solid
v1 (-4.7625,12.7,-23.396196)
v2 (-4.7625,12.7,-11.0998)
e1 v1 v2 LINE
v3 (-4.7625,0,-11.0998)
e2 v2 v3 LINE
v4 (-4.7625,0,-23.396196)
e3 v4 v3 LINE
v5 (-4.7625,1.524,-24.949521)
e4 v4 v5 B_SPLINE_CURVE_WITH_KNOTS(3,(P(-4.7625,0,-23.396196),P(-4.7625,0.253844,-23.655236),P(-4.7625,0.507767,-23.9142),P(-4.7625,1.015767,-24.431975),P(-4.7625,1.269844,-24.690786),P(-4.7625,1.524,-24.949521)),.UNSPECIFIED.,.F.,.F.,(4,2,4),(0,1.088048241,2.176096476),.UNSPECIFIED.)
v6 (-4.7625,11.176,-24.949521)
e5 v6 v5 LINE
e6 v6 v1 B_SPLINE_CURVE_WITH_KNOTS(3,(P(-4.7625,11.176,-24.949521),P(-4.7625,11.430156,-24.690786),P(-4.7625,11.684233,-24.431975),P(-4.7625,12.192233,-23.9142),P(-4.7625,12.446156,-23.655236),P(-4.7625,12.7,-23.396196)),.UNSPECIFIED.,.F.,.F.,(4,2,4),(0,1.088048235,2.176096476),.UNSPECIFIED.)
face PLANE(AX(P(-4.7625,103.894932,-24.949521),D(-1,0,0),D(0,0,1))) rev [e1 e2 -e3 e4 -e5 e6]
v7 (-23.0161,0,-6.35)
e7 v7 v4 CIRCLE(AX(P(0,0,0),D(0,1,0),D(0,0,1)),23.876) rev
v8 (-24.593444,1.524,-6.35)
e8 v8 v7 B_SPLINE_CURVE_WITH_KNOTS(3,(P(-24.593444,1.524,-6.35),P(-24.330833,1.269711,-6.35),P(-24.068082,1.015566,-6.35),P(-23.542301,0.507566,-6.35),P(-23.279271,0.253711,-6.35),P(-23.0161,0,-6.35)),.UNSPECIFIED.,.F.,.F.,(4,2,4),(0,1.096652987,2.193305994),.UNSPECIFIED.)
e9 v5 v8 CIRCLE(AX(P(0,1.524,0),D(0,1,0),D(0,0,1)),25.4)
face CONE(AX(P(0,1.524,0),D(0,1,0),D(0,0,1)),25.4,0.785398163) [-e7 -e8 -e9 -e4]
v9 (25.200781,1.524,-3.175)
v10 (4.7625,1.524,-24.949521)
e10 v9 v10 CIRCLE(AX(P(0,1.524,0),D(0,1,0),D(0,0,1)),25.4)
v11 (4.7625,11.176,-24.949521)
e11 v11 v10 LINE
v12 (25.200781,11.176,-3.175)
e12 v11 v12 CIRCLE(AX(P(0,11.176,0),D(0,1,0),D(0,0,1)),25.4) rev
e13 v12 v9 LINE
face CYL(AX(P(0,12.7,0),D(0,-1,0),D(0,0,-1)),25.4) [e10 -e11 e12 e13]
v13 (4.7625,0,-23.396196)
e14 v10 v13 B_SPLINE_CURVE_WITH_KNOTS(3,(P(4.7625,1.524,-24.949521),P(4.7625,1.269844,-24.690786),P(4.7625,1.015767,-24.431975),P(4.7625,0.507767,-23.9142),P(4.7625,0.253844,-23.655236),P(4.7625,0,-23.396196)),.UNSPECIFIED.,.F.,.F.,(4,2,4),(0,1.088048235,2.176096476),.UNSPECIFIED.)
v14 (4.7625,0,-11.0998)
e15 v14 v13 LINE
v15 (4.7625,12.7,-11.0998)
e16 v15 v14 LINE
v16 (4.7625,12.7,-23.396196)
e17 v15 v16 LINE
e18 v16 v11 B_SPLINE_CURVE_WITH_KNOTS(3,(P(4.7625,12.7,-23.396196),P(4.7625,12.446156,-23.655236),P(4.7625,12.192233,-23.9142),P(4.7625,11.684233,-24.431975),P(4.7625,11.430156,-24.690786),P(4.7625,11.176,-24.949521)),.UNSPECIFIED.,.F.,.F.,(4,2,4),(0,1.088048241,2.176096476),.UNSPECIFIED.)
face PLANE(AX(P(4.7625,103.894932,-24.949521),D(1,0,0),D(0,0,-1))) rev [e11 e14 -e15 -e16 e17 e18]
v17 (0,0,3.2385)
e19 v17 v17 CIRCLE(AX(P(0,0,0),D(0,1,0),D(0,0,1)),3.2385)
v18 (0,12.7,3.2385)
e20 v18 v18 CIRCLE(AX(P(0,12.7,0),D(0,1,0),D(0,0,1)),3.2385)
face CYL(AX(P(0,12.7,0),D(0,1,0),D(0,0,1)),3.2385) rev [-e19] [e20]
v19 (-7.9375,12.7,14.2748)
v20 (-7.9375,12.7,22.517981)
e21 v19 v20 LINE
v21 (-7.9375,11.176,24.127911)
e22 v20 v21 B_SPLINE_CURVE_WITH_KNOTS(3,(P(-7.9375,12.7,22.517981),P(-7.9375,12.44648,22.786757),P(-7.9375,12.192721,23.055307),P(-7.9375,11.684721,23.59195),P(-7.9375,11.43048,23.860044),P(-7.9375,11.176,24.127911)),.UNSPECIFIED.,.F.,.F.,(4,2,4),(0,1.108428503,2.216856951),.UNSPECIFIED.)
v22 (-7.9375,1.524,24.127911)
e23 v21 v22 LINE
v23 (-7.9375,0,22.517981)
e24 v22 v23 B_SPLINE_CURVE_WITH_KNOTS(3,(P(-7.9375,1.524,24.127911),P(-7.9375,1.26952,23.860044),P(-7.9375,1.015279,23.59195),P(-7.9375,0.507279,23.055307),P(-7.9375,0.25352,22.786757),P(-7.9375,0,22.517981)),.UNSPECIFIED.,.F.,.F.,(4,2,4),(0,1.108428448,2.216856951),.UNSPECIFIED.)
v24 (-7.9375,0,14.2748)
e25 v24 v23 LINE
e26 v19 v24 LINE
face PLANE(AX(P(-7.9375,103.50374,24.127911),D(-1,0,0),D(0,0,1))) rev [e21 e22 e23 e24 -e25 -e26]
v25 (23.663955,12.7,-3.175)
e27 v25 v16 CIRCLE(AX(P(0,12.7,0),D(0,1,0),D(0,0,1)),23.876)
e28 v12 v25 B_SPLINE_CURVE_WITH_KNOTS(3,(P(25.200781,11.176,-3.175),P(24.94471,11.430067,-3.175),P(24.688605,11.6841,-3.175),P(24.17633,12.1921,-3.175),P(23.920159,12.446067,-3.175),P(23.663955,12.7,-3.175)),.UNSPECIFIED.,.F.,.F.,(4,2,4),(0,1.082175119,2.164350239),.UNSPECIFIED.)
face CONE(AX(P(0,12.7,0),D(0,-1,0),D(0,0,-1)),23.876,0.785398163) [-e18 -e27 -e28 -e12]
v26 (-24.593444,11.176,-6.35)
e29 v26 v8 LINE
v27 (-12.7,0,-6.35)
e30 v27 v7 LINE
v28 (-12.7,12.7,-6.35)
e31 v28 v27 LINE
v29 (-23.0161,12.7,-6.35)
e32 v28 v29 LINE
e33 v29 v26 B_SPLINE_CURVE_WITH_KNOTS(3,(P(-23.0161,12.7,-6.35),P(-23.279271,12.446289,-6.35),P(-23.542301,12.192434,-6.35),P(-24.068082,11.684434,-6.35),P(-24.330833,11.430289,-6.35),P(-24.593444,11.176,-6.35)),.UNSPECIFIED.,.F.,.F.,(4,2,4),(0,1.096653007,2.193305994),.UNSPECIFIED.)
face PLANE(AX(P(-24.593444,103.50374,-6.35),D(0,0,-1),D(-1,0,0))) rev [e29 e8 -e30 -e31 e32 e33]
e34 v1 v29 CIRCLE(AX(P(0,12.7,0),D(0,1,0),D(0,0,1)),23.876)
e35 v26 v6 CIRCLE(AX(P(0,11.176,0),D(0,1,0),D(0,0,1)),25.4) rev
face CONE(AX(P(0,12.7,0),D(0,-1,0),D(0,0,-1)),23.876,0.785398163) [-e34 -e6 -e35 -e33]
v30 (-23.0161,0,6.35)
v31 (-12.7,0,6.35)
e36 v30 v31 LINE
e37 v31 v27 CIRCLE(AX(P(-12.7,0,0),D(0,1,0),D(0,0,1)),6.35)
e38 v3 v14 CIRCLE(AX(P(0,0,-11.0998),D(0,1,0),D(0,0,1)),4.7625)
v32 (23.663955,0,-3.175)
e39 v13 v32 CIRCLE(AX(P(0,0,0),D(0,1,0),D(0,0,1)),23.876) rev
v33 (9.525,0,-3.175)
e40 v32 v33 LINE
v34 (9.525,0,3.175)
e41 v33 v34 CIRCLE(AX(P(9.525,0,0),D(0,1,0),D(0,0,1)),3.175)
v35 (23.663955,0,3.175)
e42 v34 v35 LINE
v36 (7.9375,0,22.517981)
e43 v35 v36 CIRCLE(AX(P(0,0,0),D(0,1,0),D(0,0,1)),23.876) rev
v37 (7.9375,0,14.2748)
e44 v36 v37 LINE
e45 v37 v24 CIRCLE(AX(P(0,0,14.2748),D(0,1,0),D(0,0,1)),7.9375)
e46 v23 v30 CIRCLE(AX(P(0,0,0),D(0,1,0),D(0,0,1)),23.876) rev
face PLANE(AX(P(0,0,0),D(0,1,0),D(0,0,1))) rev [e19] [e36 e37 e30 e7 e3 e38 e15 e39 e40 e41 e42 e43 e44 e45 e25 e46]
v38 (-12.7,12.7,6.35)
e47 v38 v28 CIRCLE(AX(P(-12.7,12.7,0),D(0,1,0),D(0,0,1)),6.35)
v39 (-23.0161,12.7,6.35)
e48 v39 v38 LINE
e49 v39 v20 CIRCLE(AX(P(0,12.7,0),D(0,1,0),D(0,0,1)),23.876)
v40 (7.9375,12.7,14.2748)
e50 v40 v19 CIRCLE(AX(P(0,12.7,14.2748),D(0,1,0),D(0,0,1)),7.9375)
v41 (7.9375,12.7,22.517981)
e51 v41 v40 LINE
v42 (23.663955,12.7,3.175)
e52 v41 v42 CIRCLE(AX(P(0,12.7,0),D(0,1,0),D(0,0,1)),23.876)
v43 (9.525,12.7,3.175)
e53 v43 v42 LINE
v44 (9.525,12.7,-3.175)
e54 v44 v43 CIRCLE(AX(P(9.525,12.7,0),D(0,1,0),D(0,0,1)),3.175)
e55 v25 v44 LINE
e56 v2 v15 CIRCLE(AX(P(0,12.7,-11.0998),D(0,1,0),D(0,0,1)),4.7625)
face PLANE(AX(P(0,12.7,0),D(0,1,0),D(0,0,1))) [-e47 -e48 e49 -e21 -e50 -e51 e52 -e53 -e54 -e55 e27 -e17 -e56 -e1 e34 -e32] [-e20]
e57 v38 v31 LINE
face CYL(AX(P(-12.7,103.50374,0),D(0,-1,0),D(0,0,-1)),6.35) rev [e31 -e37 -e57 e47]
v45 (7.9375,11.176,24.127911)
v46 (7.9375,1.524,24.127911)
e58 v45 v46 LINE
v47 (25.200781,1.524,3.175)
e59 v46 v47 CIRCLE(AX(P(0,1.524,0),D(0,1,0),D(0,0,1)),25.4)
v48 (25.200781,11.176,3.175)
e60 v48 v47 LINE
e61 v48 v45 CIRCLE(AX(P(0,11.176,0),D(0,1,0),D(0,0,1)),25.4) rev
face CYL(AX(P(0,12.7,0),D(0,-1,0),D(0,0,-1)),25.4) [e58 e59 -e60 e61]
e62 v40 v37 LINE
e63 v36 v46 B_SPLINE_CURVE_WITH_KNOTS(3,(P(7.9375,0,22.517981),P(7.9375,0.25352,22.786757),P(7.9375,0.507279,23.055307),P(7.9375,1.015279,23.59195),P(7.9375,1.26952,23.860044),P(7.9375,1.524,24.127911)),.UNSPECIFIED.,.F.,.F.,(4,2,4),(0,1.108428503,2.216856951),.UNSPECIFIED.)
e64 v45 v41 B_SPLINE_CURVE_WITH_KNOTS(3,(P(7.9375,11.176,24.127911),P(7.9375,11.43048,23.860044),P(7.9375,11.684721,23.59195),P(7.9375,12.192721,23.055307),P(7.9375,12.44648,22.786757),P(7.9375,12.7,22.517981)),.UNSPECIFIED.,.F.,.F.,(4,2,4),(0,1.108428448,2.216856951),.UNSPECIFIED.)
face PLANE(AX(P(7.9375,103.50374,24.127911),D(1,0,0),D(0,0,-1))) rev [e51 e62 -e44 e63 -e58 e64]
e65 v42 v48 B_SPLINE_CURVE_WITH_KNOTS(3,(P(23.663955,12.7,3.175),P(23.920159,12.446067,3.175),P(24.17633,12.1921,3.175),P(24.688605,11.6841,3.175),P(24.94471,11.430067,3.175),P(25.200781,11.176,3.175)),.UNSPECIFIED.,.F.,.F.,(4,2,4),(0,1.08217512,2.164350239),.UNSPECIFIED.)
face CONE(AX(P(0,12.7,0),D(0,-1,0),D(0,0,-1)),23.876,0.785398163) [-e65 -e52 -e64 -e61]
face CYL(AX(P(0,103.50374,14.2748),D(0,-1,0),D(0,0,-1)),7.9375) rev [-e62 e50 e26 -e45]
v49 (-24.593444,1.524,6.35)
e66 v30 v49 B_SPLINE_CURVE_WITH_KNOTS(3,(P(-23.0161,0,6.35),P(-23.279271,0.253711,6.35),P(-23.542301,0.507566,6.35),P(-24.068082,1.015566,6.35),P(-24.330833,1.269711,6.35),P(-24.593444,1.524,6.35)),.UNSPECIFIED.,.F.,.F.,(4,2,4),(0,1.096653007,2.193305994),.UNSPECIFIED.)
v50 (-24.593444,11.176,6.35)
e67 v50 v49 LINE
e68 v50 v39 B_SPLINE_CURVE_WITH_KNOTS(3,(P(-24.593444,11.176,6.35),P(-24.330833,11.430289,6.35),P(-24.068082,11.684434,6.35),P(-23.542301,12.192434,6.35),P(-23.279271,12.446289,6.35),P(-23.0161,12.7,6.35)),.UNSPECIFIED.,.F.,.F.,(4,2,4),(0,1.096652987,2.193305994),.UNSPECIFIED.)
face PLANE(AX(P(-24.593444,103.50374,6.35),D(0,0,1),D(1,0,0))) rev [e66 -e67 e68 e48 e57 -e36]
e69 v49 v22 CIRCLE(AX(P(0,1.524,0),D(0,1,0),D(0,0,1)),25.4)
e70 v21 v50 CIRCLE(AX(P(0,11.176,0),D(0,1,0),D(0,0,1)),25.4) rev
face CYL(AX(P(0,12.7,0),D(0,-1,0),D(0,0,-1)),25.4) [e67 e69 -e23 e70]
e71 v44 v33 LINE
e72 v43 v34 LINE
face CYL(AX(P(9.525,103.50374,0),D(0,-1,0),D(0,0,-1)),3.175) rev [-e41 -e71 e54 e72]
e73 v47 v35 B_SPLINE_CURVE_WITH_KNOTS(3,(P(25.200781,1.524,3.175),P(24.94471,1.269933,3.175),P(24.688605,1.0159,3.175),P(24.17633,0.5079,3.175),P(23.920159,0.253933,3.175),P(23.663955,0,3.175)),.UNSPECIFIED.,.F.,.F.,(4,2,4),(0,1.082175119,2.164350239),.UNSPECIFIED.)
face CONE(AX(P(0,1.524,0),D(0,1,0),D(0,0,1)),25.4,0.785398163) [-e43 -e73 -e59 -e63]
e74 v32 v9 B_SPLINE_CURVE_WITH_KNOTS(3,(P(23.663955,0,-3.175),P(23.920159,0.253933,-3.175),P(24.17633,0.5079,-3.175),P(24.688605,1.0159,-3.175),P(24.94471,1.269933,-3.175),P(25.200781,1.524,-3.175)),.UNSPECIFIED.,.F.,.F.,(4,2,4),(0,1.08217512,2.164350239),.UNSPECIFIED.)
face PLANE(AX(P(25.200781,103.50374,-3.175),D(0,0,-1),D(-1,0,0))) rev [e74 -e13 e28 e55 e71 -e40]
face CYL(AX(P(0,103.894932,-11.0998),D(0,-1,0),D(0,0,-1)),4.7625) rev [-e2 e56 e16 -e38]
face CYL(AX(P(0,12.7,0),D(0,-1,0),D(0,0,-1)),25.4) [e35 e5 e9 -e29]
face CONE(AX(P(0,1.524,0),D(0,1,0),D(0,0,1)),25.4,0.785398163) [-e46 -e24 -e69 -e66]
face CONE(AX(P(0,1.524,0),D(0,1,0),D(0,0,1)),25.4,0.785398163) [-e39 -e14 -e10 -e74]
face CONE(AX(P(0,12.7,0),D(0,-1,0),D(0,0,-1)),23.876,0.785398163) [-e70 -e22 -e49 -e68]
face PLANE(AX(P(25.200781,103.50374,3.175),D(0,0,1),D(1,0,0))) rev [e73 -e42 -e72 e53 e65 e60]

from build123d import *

# Parameters (mm, degrees)
SKETCH1_R           = 25.4
BOSS_EXTRUDE1_DEPTH = 12.7
HOLE1_D             = 6.477
CUT_EXTRUDE4_DEPTH  = 39.1
CIRPATTERN1_DEPTH   = 12.7
CHAMFER1_SIZE       = 1.524


# Read off the part's stored shape, not the designer's step: CirPattern1
with BuildPart() as part:
    # Sketch1 → Boss-Extrude1 (new body)
    with BuildSketch(Plane(origin=(0, 0, 0), x_dir=(1, 0, 0), z_dir=(0, 1, 0))):
        with Locations(Location((0, 0, 0), (0, 0, 270))):
            Circle(SKETCH1_R)
    extrude(amount=BOSS_EXTRUDE1_DEPTH)

    # Hole1 (through all)
    with Locations(Plane(origin=(0, 12.7, 0), x_dir=(1, 0, 0), z_dir=(0, 1, 0))):
        with Locations((0, 0)):
            Hole(HOLE1_D / 2)

    # Sketch4 → Cut-Extrude4 (cut, symmetric)
    with BuildSketch(Plane(origin=(0, 12.7, 0), x_dir=(1, 0, 0), z_dir=(0, 1, 0))):
        with BuildLine():
            Line((-4.7625, 152.335221274), (-4.7625, 24.949520912))
            Line((-4.7625, 24.949520912), (-4.7625, 11.0998))
            ThreePointArc((-4.7625, 11.0998), (0, 6.3373), (4.7625, 11.0998))
            Line((4.7625, 11.0998), (4.7625, 24.949520912))
            Line((4.7625, 24.949520912), (4.7625, 152.335221274))
            Line((4.7625, 152.335221274), (4.7625, 407.106621997))
            Line((4.7625, 407.106621997), (-4.7625, 407.106621997))
            Line((-4.7625, 407.106621997), (-4.7625, 152.335221274))
        make_face()
    extrude(amount=CUT_EXTRUDE4_DEPTH, both=True, mode=Mode.SUBTRACT)

    # CirPattern1 outline → CirPattern1 (cut)
    with BuildSketch(Plane(origin=(0, 0, 0), x_dir=(1, 0, 0), z_dir=(0, 1, 0))):
        with BuildLine():
            ThreePointArc((-24.593444248, 6.35), (-25.4, 0), (-24.593444248, -6.35))
            Line((-24.593444248, -6.35), (-12.7, -6.35))
            ThreePointArc((-12.7, -6.35), (-6.35, 0), (-12.7, 6.35))
            Line((-12.7, 6.35), (-24.593444248, 6.35))
        make_face()
        with BuildLine():
            Line((9.525, -3.175), (25.200781238, -3.175))
            ThreePointArc((25.200781238, -3.175), (25.4, 0), (25.200781238, 3.175))
            Line((25.200781238, 3.175), (9.525, 3.175))
            ThreePointArc((9.525, 3.175), (6.35, 0), (9.525, -3.175))
        make_face()
        with BuildLine():
            Line((-7.9375, -14.2748), (-7.9375, -24.127911094))
            ThreePointArc((-7.9375, -24.127911094), (0, -25.4), (7.9375, -24.127911094))
            Line((7.9375, -24.127911094), (7.9375, -14.2748))
            ThreePointArc((7.9375, -14.2748), (0, -6.3373), (-7.9375, -14.2748))
        make_face()
    extrude(amount=CIRPATTERN1_DEPTH, mode=Mode.SUBTRACT)

    # Chamfer1
    chamfer1_edges = [part.edges().sort_by_distance(p)[0] for p in [
        (-17.37608731, 0, -18.526510459),
        (-17.37608731, 12.7, -18.526510459),
        (-18.535887196, 0, 17.366084356),
        (-18.535887196, 12.7, 17.366084356),
        (19.603380874, 0, 16.151391839),
        (19.603380874, 12.7, 16.151391839),
        (18.519773105, 0, -17.383267936),
        (18.519773105, 12.7, -17.383267936),
    ]]
    chamfer(chamfer1_edges, length=CHAMFER1_SIZE)


solid = part.part
